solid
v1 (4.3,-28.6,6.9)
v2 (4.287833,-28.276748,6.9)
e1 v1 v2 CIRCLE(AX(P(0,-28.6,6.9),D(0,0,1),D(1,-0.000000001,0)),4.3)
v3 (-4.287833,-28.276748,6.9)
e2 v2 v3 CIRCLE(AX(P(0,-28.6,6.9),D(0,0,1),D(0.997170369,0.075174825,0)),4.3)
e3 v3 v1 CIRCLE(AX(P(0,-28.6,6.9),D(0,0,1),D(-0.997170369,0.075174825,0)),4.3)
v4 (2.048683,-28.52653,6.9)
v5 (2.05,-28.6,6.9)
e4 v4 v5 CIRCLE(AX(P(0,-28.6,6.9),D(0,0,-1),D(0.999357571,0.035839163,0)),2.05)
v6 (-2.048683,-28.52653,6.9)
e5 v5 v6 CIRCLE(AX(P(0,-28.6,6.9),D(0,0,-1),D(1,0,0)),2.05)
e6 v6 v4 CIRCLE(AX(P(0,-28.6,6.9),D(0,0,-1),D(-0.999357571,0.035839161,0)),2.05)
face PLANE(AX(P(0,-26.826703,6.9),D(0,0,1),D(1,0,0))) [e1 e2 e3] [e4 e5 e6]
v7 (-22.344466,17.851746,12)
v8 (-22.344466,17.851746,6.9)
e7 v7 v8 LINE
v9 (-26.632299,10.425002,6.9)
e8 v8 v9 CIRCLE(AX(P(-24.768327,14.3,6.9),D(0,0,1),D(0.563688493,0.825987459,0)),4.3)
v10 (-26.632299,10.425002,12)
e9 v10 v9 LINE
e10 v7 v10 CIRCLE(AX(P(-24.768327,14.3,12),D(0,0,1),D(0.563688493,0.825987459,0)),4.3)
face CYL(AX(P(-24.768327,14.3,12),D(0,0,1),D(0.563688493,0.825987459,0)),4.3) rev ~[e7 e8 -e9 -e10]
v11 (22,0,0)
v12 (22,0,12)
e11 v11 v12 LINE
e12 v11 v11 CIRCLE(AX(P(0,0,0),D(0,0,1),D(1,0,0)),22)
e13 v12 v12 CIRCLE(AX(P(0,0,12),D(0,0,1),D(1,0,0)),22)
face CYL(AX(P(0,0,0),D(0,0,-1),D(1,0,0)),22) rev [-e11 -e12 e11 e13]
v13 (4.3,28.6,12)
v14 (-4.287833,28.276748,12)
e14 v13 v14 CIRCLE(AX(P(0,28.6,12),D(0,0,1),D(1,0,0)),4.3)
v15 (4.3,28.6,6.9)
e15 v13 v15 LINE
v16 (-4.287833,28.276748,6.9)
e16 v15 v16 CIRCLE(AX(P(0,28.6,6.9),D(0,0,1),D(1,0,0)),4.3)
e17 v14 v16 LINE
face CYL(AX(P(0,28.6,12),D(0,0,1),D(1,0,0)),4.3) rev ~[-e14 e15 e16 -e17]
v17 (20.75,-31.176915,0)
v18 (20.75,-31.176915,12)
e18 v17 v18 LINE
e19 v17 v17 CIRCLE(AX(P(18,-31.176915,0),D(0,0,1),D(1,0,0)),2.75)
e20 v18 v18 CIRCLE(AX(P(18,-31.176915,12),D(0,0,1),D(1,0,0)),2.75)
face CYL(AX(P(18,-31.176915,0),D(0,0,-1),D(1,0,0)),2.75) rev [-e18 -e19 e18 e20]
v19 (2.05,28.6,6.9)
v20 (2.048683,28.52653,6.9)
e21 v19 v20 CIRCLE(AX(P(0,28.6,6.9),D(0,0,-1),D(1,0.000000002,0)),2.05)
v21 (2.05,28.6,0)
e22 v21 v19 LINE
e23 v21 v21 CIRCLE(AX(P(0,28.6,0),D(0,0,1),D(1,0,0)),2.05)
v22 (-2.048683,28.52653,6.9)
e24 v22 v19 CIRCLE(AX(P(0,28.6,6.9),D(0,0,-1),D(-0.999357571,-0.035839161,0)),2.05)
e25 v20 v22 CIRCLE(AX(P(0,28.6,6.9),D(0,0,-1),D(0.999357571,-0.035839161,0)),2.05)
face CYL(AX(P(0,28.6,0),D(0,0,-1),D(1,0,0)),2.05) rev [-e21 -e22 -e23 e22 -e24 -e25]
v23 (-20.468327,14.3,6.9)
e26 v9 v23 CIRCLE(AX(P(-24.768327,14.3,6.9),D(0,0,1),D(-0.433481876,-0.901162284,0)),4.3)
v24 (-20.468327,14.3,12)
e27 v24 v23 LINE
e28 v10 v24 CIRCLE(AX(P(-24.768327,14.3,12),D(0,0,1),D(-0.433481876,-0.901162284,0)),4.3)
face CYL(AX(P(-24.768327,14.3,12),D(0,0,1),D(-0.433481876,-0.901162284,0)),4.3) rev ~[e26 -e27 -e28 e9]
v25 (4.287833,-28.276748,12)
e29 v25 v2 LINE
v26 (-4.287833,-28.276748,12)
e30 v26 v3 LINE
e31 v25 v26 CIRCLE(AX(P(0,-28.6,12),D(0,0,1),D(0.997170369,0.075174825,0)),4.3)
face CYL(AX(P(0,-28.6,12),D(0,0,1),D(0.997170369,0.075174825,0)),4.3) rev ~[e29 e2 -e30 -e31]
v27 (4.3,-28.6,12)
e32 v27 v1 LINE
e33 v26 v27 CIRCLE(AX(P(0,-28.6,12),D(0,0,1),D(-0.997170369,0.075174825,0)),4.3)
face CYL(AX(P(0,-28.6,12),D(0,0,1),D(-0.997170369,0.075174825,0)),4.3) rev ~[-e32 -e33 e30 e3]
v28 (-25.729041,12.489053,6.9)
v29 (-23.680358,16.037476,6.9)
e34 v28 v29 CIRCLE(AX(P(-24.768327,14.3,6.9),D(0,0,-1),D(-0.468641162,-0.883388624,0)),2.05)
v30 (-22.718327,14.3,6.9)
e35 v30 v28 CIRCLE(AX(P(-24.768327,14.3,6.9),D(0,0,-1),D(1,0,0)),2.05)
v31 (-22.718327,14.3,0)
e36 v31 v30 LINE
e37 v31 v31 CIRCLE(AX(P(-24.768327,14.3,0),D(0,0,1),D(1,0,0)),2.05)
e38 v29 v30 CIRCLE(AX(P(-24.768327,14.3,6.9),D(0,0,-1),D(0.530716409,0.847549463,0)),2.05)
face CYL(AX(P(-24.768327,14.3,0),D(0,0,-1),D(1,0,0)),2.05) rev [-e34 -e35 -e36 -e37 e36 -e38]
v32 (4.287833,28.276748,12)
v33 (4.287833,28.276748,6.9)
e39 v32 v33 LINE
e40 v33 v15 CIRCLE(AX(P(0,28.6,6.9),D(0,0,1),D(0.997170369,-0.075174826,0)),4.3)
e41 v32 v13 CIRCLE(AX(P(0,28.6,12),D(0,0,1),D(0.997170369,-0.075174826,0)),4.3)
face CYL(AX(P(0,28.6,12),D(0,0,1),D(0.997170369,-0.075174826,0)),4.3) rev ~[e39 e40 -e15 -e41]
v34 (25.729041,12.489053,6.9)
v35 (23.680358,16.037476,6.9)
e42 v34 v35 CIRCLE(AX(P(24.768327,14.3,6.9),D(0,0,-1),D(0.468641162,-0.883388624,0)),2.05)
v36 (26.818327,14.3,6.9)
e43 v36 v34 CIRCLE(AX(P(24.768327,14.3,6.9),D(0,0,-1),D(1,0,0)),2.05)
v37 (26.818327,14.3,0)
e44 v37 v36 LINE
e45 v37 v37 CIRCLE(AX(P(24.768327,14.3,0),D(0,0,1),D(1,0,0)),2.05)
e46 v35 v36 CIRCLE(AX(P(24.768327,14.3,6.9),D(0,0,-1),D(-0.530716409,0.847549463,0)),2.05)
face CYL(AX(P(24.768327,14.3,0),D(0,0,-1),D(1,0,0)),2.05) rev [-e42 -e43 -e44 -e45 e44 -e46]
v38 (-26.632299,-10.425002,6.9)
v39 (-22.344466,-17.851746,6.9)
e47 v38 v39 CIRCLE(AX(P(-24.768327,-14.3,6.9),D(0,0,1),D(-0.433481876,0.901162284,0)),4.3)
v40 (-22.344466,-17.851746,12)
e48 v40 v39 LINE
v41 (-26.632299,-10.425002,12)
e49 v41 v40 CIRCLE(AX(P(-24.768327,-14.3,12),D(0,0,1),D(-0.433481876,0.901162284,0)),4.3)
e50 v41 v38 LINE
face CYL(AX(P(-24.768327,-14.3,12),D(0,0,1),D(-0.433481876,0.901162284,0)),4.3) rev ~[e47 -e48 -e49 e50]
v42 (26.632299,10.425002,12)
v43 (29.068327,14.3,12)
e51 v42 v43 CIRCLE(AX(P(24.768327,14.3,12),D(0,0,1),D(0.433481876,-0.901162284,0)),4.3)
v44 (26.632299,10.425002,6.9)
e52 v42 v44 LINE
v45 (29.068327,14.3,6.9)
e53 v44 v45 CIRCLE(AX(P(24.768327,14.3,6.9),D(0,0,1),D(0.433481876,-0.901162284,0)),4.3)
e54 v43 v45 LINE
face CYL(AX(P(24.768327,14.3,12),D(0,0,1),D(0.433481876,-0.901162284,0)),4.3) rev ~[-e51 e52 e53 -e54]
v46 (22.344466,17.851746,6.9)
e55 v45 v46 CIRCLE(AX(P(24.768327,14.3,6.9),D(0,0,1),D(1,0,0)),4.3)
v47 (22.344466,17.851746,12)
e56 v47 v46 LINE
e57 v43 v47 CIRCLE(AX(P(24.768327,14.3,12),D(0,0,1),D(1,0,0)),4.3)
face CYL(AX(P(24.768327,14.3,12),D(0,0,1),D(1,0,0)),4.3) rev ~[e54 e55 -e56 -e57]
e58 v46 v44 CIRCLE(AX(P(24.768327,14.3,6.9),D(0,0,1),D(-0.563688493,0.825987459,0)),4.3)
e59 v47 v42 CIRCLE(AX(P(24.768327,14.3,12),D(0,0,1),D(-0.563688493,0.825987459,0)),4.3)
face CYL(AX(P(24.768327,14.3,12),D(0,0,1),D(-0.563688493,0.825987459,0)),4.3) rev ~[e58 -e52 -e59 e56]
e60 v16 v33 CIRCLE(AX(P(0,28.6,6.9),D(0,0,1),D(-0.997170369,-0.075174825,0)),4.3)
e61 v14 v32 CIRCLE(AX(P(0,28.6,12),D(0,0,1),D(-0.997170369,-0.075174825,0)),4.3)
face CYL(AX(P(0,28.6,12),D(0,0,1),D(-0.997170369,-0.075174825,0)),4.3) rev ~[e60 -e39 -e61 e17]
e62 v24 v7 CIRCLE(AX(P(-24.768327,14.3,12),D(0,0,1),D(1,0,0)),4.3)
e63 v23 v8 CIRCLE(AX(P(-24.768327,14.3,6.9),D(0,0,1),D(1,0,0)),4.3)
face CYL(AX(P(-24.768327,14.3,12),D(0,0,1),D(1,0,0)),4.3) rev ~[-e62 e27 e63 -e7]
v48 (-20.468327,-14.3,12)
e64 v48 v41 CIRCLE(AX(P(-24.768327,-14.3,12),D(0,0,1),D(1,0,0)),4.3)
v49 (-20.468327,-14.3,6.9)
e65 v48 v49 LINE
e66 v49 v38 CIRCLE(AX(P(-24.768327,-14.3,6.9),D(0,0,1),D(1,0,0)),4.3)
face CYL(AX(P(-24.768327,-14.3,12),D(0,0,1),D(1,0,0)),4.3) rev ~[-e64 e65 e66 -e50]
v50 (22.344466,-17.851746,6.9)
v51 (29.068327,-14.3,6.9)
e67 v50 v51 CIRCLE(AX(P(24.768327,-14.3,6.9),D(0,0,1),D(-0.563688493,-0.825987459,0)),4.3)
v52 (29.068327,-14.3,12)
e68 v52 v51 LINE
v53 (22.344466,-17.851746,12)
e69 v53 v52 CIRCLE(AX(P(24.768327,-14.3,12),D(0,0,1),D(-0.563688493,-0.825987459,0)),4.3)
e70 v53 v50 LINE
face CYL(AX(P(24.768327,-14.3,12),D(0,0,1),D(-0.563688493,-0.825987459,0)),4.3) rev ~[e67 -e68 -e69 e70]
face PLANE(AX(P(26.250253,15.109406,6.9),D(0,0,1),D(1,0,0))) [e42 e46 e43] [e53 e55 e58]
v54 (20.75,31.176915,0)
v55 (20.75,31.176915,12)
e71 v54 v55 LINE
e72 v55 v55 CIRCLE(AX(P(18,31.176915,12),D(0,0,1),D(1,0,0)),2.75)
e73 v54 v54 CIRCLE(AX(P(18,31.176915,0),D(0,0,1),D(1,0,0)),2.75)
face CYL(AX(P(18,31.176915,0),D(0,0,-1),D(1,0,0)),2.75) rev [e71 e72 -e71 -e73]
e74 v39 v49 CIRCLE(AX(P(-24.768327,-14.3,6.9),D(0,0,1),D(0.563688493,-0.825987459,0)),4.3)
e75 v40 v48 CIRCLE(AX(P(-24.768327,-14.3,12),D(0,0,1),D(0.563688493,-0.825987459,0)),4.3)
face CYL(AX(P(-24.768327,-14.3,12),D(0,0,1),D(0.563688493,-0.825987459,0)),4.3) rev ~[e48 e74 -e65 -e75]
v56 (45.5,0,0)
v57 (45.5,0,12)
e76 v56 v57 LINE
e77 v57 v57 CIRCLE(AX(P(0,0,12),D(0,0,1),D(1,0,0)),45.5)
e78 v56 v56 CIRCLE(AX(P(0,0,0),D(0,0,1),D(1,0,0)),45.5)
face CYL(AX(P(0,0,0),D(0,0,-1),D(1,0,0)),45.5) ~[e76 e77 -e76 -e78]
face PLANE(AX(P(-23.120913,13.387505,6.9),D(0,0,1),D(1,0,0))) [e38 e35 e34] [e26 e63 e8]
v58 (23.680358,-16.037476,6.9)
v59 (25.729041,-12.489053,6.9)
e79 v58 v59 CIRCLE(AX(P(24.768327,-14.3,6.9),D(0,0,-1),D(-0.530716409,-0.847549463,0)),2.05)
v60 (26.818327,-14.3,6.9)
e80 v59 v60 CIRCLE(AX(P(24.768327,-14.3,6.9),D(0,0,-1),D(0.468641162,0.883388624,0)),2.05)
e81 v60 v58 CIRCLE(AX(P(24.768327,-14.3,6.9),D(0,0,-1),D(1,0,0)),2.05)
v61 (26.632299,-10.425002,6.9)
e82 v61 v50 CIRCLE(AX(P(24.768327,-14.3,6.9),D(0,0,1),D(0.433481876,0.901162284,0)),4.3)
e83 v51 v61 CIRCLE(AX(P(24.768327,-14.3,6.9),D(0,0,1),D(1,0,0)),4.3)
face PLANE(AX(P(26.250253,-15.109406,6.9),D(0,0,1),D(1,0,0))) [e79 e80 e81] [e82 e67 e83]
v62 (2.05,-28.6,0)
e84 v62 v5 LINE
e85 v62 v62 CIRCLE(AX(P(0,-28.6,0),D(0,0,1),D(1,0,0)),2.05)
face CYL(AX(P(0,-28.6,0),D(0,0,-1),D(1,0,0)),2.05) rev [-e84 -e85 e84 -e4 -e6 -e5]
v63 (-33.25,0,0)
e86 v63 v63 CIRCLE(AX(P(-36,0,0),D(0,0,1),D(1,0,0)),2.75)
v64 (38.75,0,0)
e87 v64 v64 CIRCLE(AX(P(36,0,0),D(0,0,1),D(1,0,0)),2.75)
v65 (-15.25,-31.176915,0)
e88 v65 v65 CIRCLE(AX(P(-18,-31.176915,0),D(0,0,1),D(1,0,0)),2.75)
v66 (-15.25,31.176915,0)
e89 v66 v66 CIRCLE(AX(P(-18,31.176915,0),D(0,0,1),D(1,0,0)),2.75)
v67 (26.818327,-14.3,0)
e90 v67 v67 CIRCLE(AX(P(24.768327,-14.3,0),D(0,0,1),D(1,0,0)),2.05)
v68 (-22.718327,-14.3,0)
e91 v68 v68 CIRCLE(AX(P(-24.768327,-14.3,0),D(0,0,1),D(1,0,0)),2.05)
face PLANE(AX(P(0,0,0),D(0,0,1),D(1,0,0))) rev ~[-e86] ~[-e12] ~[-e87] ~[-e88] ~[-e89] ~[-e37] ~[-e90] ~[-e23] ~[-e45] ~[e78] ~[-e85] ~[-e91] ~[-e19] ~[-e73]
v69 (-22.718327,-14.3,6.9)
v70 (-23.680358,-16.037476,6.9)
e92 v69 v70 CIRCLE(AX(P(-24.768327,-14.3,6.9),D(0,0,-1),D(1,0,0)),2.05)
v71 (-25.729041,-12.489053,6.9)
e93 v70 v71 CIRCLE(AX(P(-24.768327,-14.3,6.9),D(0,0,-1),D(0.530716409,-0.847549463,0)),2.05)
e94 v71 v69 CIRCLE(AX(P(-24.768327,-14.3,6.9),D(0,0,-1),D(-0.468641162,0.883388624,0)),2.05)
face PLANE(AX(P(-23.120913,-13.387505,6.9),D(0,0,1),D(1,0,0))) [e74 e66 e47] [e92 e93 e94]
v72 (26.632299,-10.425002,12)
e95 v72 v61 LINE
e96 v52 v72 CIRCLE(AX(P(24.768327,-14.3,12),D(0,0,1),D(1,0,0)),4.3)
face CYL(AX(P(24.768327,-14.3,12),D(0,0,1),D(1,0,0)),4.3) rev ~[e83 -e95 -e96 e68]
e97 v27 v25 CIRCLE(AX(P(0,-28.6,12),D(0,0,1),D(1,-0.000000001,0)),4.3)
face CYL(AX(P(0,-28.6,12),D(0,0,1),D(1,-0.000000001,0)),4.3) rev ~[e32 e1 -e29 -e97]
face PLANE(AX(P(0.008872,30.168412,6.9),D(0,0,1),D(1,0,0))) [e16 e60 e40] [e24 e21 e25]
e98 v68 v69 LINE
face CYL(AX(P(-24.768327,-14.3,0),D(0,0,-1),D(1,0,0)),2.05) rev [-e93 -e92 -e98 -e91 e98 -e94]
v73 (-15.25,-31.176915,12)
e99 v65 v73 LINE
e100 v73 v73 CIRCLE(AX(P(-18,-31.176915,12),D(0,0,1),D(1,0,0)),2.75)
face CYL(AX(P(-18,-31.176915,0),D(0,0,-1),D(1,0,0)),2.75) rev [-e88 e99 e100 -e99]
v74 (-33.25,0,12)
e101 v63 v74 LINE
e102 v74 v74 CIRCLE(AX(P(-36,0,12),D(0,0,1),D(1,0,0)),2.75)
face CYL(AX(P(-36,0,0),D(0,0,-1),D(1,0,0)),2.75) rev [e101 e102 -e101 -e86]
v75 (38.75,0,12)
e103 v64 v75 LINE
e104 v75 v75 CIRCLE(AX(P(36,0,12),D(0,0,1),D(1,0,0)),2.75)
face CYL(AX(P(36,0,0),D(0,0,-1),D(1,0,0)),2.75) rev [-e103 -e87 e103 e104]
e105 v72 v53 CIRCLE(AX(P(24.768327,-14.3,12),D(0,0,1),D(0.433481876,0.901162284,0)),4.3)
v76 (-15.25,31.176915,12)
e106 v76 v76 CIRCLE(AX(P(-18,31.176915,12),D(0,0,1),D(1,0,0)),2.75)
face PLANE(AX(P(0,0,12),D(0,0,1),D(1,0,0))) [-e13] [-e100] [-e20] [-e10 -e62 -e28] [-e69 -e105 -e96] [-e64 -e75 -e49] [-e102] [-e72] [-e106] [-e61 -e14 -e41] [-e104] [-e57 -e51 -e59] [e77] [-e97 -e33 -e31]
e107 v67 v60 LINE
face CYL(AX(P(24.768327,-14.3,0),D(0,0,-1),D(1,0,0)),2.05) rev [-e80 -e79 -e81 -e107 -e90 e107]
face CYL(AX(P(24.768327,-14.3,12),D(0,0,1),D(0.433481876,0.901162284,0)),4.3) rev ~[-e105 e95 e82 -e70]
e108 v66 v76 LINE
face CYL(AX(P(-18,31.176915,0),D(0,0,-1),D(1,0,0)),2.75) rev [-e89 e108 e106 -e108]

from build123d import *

# Parameters (mm, degrees)
F0_R     = 45.5
F0_R_2   = 2.75
F0_R_3   = 2.05
F0_R_4   = 22
F1_DEPTH = 12
F3_DEPTH = 5.1


# Not quite as in the source:
# - a feature names something its author has since deleted; it is built from what else it names


with BuildPart() as f1:
    # F0 (on Top) → F1 (new body)
    with BuildSketch(Plane.XY):
        Circle(F0_R)
        with Locations((-18, -31.1769145362)):
            Circle(F0_R_2, mode=Mode.SUBTRACT)
        with Locations((-24.7683265482, -14.3)):
            Circle(F0_R_3, mode=Mode.SUBTRACT)
        with Locations((0, -28.6)):
            Circle(F0_R_3, mode=Mode.SUBTRACT)
        with Locations((18, -31.1769145362)):
            Circle(F0_R_2, mode=Mode.SUBTRACT)
        with Locations((24.7683265482, -14.3)):
            Circle(F0_R_3, mode=Mode.SUBTRACT)
        with Locations((-36, 0)):
            Circle(F0_R_2, mode=Mode.SUBTRACT)
        with Locations((-24.7683265482, 14.3)):
            Circle(F0_R_3, mode=Mode.SUBTRACT)
        with Locations((-18, 31.1769145362)):
            Circle(F0_R_2, mode=Mode.SUBTRACT)
        Circle(F0_R_4, mode=Mode.SUBTRACT)
        with Locations((36, 0)):
            Circle(F0_R_2, mode=Mode.SUBTRACT)
        with Locations((24.7683265482, 14.3)):
            Circle(F0_R_3, mode=Mode.SUBTRACT)
        with Locations((0, 28.6)):
            Circle(F0_R_3, mode=Mode.SUBTRACT)
        with Locations((18, 31.1769145362)):
            Circle(F0_R_2, mode=Mode.SUBTRACT)
    extrude(amount=F1_DEPTH)

    # F2 (on face) → F3 (cut)
    with BuildSketch(Plane.XY.offset(12)):
        with BuildLine():
            ThreePointArc((-20.4683265482, 14.3), (-20.9661824008, 16.3084072998), (-22.3444660282, 17.8517460747))
            ThreePointArc((-22.3444660282, 17.8517460747), (-23.0302843715, 16.957771132), (-23.6803579094, 16.0374764001))
            ThreePointArc((-23.6803579094, 16.0374764001), (-22.9748891072, 15.2930166893), (-22.7183265482, 14.3))
            ThreePointArc((-22.7183265482, 14.3), (-23.7116725089, 12.5433036002), (-25.7290409298, 12.4890533202))
            ThreePointArc((-25.7290409298, 12.4890533202), (-26.2010027777, 11.4659257561), (-26.6322986167, 10.425002177))
            ThreePointArc((-26.6322986167, 10.425002177), (-22.4797767776, 10.6595961835), (-20.4683265482, 14.3))
        make_face()
        with BuildLine():
            ThreePointArc((-23.6803579094, 16.0374764001), (-23.0302843715, 16.957771132), (-22.3444660282, 17.8517460747))
            ThreePointArc((-22.3444660282, 17.8517460747), (-28.4922357845, 16.45), (-26.6322986167, 10.425002177))
            ThreePointArc((-26.6322986167, 10.425002177), (-26.2010027777, 11.4659257561), (-25.7290409298, 12.4890533202))
            ThreePointArc((-25.7290409298, 12.4890533202), (-26.543678626, 15.325), (-23.6803579094, 16.0374764001))
        make_face()
        with BuildLine():
            ThreePointArc((2.0486830204, 28.5265297203), (3.1707184061, 28.4236968881), (4.2878325885, 28.2767482517))
            ThreePointArc((4.2878325885, 28.2767482517), (4.2969570705, 28.438259669), (4.3, 28.6))
            ThreePointArc((4.3, 28.6), (-0.161740331, 32.8969570705), (-4.2878325885, 28.2767482517))
            ThreePointArc((-4.2878325885, 28.2767482517), (-3.1707184061, 28.4236968881), (-2.0486830204, 28.5265297203))
            ThreePointArc((-2.0486830204, 28.5265297203), (-0.0367410412, 30.6496707287), (2.05, 28.6))
            ThreePointArc((2.05, 28.6), (2.0496707287, 28.5632589588), (2.0486830204, 28.5265297203))
        make_face()
        with BuildLine():
            ThreePointArc((-4.2878325885, 28.2767482517), (0, 24.3), (4.2878325885, 28.2767482517))
            ThreePointArc((4.2878325885, 28.2767482517), (3.1707184061, 28.4236968881), (2.0486830204, 28.5265297203))
            ThreePointArc((2.0486830204, 28.5265297203), (0, 26.55), (-2.0486830204, 28.5265297203))
            ThreePointArc((-2.0486830204, 28.5265297203), (-3.1707184061, 28.4236968881), (-4.2878325885, 28.2767482517))
        make_face()
        with BuildLine():
            ThreePointArc((25.7290409298, 12.4890533202), (26.2010027777, 11.4659257561), (26.6322986167, 10.425002177))
            ThreePointArc((26.6322986167, 10.425002177), (28.4087303647, 12.0114502293), (29.0683265482, 14.3))
            ThreePointArc((29.0683265482, 14.3), (26.776733848, 18.1021441475), (22.3444660282, 17.8517460747))
            ThreePointArc((22.3444660282, 17.8517460747), (23.0302843715, 16.957771132), (23.6803579094, 16.0374764001))
            ThreePointArc((23.6803579094, 16.0374764001), (25.7613432375, 16.093437441), (26.8183265482, 14.3))
            ThreePointArc((26.8183265482, 14.3), (26.525022948, 13.2433459606), (25.7290409298, 12.4890533202))
        make_face()
        with BuildLine():
            ThreePointArc((22.3444660282, 17.8517460747), (21.044417312, 12.15), (26.6322986167, 10.425002177))
            ThreePointArc((26.6322986167, 10.425002177), (26.2010027777, 11.4659257561), (25.7290409298, 12.4890533202))
            ThreePointArc((25.7290409298, 12.4890533202), (22.9929744705, 13.275), (23.6803579094, 16.0374764001))
            ThreePointArc((23.6803579094, 16.0374764001), (23.0302843715, 16.957771132), (22.3444660282, 17.8517460747))
        make_face()
        with BuildLine():
            ThreePointArc((29.0683265482, -14.3), (28.4087303647, -12.0114502293), (26.6322986167, -10.425002177))
            ThreePointArc((26.6322986167, -10.425002177), (26.2010027777, -11.4659257561), (25.7290409298, -12.4890533202))
            ThreePointArc((25.7290409298, -12.4890533202), (26.525022948, -13.2433459606), (26.8183265482, -14.3))
            ThreePointArc((26.8183265482, -14.3), (25.7613432375, -16.093437441), (23.6803579094, -16.0374764001))
            ThreePointArc((23.6803579094, -16.0374764001), (23.0302843715, -16.957771132), (22.3444660282, -17.8517460747))
            ThreePointArc((22.3444660282, -17.8517460747), (26.776733848, -18.1021441475), (29.0683265482, -14.3))
        make_face()
        with BuildLine():
            ThreePointArc((25.7290409298, -12.4890533202), (26.2010027777, -11.4659257561), (26.6322986167, -10.425002177))
            ThreePointArc((26.6322986167, -10.425002177), (21.044417312, -12.15), (22.3444660282, -17.8517460747))
            ThreePointArc((22.3444660282, -17.8517460747), (23.0302843715, -16.957771132), (23.6803579094, -16.0374764001))
            ThreePointArc((23.6803579094, -16.0374764001), (22.9929744705, -13.275), (25.7290409298, -12.4890533202))
        make_face()
        with BuildLine():
            ThreePointArc((2.0486830204, -28.5265297203), (3.1707184061, -28.4236968881), (4.2878325885, -28.2767482517))
            ThreePointArc((4.2878325885, -28.2767482517), (0, -24.3), (-4.2878325885, -28.2767482517))
            ThreePointArc((-4.2878325885, -28.2767482517), (-3.1707184061, -28.4236968881), (-2.0486830204, -28.5265297203))
            ThreePointArc((-2.0486830204, -28.5265297203), (0, -26.55), (2.0486830204, -28.5265297203))
        make_face()
        with BuildLine():
            ThreePointArc((4.3, -28.6), (4.2969570705, -28.438259669), (4.2878325885, -28.2767482517))
            ThreePointArc((4.2878325885, -28.2767482517), (3.1707184061, -28.4236968881), (2.0486830204, -28.5265297203))
            ThreePointArc((2.0486830204, -28.5265297203), (2.0496707287, -28.5632589588), (2.05, -28.6))
            ThreePointArc((2.05, -28.6), (-0.0367410412, -30.6496707287), (-2.0486830204, -28.5265297203))
            ThreePointArc((-2.0486830204, -28.5265297203), (-3.1707184061, -28.4236968881), (-4.2878325885, -28.2767482517))
            ThreePointArc((-4.2878325885, -28.2767482517), (-0.161740331, -32.8969570705), (4.3, -28.6))
        make_face()
        with BuildLine():
            ThreePointArc((-23.6803579094, -16.0374764001), (-23.0302843715, -16.957771132), (-22.3444660282, -17.8517460747))
            ThreePointArc((-22.3444660282, -17.8517460747), (-20.9661824008, -16.3084072998), (-20.4683265482, -14.3))
            ThreePointArc((-20.4683265482, -14.3), (-22.4797767776, -10.6595961835), (-26.6322986167, -10.425002177))
            ThreePointArc((-26.6322986167, -10.425002177), (-26.2010027777, -11.4659257561), (-25.7290409298, -12.4890533202))
            ThreePointArc((-25.7290409298, -12.4890533202), (-23.7116725089, -12.5433036002), (-22.7183265482, -14.3))
            ThreePointArc((-22.7183265482, -14.3), (-22.9748891072, -15.2930166893), (-23.6803579094, -16.0374764001))
        make_face()
        with BuildLine():
            ThreePointArc((-26.6322986167, -10.425002177), (-28.4922357845, -16.45), (-22.3444660282, -17.8517460747))
            ThreePointArc((-22.3444660282, -17.8517460747), (-23.0302843715, -16.957771132), (-23.6803579094, -16.0374764001))
            ThreePointArc((-23.6803579094, -16.0374764001), (-26.543678626, -15.325), (-25.7290409298, -12.4890533202))
            ThreePointArc((-25.7290409298, -12.4890533202), (-26.2010027777, -11.4659257561), (-26.6322986167, -10.425002177))
        make_face()
    extrude(amount=-F3_DEPTH, mode=Mode.SUBTRACT)


solid = f1.part
